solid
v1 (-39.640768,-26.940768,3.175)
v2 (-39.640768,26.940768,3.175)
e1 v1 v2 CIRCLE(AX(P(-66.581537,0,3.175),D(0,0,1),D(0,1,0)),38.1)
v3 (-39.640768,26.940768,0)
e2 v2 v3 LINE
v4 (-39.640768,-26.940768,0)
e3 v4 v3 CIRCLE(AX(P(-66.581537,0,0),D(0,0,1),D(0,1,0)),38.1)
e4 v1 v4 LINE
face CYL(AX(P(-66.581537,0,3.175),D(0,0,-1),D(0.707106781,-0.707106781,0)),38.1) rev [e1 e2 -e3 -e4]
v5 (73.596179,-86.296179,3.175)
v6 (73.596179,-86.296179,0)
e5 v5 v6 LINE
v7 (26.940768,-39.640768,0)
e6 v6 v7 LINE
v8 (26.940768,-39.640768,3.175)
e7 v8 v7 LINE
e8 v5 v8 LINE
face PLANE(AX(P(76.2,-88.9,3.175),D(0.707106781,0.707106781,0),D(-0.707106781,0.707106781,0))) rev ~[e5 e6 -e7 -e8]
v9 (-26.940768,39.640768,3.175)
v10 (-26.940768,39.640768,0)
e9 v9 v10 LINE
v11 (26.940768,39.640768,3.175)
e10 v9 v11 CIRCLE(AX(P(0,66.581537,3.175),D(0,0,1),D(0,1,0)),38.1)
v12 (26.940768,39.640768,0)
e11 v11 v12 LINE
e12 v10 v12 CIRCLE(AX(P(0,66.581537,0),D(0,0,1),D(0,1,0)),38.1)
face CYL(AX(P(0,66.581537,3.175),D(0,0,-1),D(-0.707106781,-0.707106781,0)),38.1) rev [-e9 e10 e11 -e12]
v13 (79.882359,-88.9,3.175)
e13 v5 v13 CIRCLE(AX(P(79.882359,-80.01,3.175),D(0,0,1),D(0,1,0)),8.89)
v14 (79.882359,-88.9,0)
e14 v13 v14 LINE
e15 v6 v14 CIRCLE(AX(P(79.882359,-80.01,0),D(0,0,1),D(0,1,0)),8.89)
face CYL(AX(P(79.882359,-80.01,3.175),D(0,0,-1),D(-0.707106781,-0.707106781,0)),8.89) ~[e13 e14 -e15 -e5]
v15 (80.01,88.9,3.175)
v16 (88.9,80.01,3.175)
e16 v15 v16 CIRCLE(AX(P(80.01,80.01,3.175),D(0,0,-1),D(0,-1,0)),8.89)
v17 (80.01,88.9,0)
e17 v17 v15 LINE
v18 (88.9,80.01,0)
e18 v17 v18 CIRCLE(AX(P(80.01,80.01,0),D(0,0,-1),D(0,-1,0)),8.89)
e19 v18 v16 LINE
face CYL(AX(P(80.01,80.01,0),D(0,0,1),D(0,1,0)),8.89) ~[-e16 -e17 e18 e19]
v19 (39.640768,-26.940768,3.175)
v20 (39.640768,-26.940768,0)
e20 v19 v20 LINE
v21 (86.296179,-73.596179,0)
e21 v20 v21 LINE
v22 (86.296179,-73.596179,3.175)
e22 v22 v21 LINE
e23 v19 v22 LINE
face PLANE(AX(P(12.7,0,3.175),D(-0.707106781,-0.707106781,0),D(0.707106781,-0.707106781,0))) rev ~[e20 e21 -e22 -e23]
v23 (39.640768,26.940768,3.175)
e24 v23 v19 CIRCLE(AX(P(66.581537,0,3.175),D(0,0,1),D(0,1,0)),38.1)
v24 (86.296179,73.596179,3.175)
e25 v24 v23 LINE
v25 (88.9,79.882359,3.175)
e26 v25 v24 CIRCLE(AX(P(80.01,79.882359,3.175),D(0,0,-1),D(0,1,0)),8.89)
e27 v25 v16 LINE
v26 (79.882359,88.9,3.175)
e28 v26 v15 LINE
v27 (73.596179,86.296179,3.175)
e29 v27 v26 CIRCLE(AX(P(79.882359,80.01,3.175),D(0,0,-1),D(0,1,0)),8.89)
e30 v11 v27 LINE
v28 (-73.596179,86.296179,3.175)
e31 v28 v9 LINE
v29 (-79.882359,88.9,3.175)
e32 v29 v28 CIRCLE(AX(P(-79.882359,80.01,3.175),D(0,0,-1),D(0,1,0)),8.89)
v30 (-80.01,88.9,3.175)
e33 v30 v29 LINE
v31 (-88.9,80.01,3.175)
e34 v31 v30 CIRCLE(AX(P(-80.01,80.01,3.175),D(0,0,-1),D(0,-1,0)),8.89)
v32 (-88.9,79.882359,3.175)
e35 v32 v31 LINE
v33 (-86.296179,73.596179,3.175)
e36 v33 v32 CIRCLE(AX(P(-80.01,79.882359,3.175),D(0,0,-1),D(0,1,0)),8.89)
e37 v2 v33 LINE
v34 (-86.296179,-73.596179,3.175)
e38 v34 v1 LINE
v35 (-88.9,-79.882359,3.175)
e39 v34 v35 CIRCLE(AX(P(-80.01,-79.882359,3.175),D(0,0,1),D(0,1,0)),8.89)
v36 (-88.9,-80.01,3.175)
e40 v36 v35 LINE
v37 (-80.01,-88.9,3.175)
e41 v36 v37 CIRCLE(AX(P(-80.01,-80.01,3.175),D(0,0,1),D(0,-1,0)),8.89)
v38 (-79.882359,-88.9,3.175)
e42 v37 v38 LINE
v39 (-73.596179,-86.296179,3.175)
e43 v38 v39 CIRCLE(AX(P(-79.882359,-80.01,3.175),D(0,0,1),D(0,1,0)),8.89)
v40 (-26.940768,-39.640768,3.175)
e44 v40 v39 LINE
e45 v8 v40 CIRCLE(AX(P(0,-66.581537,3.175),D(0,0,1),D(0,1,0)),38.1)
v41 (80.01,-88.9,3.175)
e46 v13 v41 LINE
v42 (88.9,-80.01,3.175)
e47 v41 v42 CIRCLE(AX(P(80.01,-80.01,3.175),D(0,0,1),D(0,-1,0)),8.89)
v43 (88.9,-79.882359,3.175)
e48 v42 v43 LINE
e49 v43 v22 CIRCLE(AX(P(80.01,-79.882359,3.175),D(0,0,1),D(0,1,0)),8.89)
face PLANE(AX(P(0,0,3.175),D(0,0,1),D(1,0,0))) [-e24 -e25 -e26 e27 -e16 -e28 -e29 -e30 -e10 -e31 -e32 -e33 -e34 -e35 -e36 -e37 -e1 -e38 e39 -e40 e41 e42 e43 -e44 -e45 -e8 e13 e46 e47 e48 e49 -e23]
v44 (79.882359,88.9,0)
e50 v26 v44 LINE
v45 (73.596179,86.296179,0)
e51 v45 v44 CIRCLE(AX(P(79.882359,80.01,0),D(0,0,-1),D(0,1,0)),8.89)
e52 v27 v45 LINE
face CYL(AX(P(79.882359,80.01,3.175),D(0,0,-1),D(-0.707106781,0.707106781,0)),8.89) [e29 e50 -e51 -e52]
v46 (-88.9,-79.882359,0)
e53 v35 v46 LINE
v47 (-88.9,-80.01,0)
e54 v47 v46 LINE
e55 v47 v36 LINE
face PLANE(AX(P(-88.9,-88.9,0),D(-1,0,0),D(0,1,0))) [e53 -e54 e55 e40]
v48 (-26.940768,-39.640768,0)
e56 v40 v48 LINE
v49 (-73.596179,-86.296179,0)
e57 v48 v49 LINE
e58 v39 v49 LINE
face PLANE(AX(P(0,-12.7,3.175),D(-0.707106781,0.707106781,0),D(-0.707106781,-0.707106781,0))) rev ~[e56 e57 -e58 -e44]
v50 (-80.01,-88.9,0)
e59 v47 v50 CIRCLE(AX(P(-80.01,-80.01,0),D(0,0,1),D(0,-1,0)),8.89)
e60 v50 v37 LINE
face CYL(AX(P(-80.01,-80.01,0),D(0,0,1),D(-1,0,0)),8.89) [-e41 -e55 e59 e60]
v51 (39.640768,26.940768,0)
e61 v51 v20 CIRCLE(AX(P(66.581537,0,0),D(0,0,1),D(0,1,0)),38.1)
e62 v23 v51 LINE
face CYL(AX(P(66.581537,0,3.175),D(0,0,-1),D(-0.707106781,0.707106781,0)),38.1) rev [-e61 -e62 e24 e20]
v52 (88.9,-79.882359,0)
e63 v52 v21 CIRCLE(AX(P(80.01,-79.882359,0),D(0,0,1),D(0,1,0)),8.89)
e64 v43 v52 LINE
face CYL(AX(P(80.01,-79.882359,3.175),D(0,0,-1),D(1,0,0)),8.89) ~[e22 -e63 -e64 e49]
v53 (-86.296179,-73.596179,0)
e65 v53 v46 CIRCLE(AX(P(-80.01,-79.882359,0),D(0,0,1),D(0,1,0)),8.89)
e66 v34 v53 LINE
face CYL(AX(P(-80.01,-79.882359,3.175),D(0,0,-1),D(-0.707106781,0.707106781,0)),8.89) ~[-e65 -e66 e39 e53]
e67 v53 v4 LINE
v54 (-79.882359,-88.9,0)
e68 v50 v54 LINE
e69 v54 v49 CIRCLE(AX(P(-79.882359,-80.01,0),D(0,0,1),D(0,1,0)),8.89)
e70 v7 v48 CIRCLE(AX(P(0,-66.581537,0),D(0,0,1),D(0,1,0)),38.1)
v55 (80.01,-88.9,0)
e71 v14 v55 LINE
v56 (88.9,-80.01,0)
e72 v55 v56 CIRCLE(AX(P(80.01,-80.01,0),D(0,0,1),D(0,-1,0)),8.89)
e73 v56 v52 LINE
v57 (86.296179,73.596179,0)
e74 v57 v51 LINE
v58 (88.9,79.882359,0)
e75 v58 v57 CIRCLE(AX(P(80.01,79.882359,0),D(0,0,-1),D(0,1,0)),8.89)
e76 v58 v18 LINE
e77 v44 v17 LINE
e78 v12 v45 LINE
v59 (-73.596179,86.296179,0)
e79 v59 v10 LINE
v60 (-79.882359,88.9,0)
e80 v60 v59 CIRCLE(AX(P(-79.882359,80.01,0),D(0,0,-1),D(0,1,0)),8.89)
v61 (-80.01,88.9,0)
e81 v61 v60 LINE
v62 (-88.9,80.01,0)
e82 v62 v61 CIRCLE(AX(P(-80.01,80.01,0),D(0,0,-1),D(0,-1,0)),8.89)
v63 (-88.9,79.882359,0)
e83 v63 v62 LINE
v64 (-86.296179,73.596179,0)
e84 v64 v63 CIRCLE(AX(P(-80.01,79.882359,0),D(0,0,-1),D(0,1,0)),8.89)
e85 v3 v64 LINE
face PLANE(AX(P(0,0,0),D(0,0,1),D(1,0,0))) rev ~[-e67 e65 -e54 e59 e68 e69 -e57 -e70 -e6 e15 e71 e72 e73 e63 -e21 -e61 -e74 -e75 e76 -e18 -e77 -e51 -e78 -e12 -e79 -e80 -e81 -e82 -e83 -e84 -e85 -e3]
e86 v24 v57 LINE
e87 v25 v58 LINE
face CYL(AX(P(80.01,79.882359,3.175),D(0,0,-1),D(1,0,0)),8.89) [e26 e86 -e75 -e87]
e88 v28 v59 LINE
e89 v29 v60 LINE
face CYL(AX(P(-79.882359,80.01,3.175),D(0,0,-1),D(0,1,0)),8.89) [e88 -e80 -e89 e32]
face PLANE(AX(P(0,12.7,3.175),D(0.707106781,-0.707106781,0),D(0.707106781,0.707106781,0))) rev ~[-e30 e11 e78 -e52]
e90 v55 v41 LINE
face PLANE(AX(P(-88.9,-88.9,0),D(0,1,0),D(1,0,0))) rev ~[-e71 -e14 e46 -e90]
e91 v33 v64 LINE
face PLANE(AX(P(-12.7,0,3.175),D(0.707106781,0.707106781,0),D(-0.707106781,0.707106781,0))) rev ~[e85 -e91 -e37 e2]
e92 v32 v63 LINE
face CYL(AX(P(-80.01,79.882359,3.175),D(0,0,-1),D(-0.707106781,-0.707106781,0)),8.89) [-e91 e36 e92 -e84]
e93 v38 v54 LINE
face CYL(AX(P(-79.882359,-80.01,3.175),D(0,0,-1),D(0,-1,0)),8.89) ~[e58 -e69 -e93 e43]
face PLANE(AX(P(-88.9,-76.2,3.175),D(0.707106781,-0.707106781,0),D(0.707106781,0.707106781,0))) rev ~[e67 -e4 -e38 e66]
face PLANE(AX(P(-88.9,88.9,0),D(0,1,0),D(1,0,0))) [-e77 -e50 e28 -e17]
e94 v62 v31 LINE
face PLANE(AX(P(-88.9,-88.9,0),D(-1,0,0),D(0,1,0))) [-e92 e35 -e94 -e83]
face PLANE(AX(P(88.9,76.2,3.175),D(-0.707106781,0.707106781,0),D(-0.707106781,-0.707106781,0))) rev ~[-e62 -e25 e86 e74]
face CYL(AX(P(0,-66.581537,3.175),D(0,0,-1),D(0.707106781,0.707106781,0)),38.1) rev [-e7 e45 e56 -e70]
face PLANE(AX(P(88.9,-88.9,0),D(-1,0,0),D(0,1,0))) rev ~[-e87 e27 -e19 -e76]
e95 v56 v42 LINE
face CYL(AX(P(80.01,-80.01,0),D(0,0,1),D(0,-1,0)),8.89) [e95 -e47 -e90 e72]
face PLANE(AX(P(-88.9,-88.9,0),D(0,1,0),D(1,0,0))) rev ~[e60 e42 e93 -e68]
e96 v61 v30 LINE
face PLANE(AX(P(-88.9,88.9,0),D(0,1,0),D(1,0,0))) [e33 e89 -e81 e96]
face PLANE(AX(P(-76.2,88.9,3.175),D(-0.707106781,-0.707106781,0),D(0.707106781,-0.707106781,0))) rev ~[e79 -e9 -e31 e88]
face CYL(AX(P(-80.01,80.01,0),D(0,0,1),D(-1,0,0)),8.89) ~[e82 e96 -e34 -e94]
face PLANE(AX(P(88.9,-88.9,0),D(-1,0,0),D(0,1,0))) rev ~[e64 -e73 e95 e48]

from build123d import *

# Parameters (mm, degrees)
F0_W     = 177.8
F0_H     = 177.8
F1_DEPTH = 3.175
F3_DEPTH = 3.176
F4_R     = 38.1
F5_R     = 8.89


# Not quite as in the source:
# - a length typed as a fraction of an inch, garbled in the dataset ("3 / 203.2 mm" for 3/8 in), is restored


with BuildPart() as f1:
    # F0 (on Top) → F1 (new body)
    with BuildSketch(Plane.XY):
        Rectangle(F0_W, F0_H)
    extrude(amount=F1_DEPTH)

    # F2 (on face) → F3 (cut, through all)
    with BuildSketch(Plane.XY.offset(3.175)):
        Polygon((76.2, 88.9), (-76.2, 88.9), (0, 12.7), align=None)
        Polygon((88.9, -76.2), (88.9, 76.2), (12.7, 0), align=None)
        Polygon((-76.2, -88.9), (76.2, -88.9), (0, -12.7), align=None)
        Polygon((-12.7, 0), (-88.9, 76.2), (-88.9, -76.2), align=None)
    extrude(amount=-F3_DEPTH, mode=Mode.SUBTRACT)

    # F4
    f4_edges = [f1.edges().sort_by_distance(p)[0] for p in [
        (0, -12.7, 1.5875),
        (12.7, 0, 1.5875),
        (0, 12.7, 1.5875),
        (-12.7, 0, 1.5875),
    ]]
    fillet(f4_edges, radius=F4_R)

    # F5
    f5_edges = [f1.edges().sort_by_distance(p)[0] for p in [
        (88.9, 88.9, 1.5875),
        (88.9, 76.2, 1.5875),
        (88.9, -76.2, 1.5875),
        (88.9, -88.9, 1.5875),
        (76.2, -88.9, 1.5875),
        (-76.2, -88.9, 1.5875),
        (-88.9, -88.9, 1.5875),
        (-88.9, -76.2, 1.5875),
        (-88.9, 76.2, 1.5875),
        (-88.9, 88.9, 1.5875),
        (-76.2, 88.9, 1.5875),
        (76.2, 88.9, 1.5875),
    ]]
    fillet(f5_edges, radius=F5_R)


solid = f1.part
